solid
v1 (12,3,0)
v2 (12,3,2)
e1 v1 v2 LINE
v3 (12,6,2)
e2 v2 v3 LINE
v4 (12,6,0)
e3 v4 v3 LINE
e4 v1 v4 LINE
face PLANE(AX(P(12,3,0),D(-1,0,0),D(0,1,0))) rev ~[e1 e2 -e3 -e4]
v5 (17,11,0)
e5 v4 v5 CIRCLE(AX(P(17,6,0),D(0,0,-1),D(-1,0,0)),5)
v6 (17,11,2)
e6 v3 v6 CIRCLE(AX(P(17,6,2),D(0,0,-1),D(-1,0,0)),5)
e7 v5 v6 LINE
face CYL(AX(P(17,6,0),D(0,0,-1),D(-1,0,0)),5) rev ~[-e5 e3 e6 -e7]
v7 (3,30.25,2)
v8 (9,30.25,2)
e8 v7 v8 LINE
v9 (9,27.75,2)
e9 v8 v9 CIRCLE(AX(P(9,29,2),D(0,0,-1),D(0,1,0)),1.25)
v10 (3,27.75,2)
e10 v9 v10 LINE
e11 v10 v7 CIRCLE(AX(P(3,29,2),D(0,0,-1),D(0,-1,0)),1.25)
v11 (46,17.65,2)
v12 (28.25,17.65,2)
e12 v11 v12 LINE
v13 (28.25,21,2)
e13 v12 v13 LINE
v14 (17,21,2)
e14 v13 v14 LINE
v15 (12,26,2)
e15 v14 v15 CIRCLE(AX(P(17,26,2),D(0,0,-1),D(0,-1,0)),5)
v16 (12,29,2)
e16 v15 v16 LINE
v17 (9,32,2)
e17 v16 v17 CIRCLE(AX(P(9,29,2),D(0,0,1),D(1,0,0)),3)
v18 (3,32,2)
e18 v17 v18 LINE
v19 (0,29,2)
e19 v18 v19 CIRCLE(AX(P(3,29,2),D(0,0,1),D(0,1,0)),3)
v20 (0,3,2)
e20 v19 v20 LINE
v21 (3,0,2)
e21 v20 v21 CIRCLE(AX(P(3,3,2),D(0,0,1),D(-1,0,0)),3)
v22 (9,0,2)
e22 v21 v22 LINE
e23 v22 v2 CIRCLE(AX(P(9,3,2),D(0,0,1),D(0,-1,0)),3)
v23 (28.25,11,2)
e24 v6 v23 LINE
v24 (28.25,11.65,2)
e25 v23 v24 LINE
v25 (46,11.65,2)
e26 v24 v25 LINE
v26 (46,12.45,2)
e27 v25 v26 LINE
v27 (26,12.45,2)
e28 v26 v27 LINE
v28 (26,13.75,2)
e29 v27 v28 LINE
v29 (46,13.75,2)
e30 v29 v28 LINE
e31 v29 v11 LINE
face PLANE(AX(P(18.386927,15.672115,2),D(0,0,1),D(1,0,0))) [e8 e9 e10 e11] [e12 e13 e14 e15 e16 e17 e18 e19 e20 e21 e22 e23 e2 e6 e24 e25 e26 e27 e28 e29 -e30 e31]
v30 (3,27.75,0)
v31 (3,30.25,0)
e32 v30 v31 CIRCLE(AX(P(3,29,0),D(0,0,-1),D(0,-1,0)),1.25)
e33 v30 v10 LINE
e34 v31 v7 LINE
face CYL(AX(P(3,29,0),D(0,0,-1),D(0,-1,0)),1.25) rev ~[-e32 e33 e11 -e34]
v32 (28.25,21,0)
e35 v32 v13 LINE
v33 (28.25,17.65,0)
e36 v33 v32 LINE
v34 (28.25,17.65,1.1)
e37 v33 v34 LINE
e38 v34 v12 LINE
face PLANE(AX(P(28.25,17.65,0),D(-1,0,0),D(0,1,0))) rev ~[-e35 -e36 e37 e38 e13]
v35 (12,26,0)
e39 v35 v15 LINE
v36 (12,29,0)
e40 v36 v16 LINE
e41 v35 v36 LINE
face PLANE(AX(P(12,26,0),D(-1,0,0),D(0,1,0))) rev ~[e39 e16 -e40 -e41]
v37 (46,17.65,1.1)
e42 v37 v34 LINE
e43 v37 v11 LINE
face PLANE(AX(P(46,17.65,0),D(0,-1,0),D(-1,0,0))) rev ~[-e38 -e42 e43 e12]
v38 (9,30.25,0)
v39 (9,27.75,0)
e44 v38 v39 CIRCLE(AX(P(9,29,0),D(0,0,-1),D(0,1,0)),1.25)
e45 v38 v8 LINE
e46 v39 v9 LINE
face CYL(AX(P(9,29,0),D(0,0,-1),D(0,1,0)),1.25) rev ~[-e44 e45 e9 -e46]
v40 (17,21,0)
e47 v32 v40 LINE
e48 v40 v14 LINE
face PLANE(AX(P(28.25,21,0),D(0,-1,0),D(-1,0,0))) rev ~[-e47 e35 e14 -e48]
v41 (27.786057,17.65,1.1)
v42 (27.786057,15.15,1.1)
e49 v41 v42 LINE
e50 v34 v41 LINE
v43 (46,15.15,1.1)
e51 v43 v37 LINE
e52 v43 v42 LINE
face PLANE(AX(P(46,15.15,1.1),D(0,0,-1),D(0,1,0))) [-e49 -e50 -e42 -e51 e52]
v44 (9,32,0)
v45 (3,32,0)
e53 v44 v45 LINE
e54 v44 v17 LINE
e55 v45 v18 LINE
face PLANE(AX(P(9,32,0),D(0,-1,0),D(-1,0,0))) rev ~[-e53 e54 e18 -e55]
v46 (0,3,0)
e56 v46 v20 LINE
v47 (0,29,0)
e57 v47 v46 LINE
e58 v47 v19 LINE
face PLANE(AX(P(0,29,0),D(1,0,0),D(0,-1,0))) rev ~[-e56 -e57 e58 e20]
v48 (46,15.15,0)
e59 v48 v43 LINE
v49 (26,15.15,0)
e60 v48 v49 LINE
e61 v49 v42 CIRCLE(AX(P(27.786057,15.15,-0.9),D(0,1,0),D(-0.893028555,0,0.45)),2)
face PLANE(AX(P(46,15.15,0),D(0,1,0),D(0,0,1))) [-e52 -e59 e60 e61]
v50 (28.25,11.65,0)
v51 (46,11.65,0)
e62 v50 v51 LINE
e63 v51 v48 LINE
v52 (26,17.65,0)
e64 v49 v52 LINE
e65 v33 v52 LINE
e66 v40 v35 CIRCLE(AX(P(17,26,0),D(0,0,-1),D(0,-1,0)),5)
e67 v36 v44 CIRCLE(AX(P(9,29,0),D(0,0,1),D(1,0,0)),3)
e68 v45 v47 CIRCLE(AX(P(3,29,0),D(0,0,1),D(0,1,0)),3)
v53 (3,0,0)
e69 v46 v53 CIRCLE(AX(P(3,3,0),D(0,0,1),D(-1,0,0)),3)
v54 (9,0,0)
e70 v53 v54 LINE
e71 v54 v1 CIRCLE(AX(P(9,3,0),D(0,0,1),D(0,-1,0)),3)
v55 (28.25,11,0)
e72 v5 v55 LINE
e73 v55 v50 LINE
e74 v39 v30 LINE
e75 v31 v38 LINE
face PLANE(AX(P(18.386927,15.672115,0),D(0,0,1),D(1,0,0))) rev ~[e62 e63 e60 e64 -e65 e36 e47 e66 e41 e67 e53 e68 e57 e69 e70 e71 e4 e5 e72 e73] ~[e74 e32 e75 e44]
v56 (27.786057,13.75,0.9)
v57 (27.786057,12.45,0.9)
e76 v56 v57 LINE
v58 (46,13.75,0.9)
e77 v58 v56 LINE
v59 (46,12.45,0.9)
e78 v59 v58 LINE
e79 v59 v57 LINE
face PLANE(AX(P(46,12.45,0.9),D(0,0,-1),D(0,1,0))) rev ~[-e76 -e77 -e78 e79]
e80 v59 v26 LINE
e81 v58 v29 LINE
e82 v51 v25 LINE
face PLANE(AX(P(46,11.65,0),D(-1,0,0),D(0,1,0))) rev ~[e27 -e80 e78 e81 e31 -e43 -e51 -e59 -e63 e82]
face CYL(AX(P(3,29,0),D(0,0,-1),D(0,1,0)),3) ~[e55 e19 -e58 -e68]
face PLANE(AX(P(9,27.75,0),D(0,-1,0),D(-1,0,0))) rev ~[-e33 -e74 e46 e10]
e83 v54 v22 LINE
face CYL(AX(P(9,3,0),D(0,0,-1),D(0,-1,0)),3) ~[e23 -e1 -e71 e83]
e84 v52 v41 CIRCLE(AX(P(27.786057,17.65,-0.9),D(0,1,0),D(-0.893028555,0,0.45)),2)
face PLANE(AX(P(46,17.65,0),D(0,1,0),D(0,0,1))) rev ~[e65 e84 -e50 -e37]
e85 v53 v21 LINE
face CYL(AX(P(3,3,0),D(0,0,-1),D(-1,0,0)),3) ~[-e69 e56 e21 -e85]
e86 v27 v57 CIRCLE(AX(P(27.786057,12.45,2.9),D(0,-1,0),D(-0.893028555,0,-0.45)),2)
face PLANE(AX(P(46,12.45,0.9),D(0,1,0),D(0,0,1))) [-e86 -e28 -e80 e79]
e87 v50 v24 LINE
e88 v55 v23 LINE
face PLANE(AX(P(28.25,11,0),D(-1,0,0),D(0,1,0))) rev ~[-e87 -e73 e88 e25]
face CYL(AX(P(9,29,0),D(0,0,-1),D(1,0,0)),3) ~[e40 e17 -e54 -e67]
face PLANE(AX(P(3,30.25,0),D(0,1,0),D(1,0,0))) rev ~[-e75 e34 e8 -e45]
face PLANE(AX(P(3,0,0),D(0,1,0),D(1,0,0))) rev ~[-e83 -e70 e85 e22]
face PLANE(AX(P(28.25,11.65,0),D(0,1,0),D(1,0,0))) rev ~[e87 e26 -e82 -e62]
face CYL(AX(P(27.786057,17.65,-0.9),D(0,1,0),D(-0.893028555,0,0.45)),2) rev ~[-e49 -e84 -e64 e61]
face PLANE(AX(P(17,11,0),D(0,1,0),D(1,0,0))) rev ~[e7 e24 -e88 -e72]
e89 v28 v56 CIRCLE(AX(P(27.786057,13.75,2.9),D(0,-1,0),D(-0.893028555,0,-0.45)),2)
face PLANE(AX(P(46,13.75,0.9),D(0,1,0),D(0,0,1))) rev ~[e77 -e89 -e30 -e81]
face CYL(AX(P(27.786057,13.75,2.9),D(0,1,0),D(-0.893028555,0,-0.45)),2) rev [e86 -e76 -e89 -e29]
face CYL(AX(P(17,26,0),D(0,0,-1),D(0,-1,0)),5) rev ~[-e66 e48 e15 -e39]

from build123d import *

# Parameters (mm, degrees)
F1_DEPTH    = 2
F2_W        = 1.3
F2_H        = 1.1
F2_W_2      = 2.5
F3_DEPTH    = 20
F4_T1_DEPTH = 1.3
F5_T4_DEPTH = 6.9651427749


# Not quite as in the source:
# - a fillet or chamfer that OpenCascade refuses, or shapes differently, is made with other operations: its cross-section is extruded or revolved along the edge and cut away or added


with BuildPart() as f1:
    # F0 (on Top) → F1 (new body)
    with BuildSketch(Plane.XY):
        with BuildLine():
            ThreePointArc((0, 3), (0.8786796564, 0.8786796564), (3, 0))
            Line((3, 0), (9, 0))
            ThreePointArc((9, 0), (11.1213203436, 0.8786796564), (12, 3))
            Line((12, 3), (12, 6))
            ThreePointArc((12, 6), (13.4644660941, 9.5355339059), (17, 11))
            Line((17, 11), (28.25, 11))
            Line((28.25, 11), (28.25, 11.65))
            Line((28.25, 11.65), (46, 11.65))
            Line((46, 11.65), (46, 17.65))
            Line((46, 17.65), (28.25, 17.65))
            Line((28.25, 17.65), (28.25, 21))
            Line((28.25, 21), (17, 21))
            ThreePointArc((17, 21), (13.4644660941, 22.4644660941), (12, 26))
            Line((12, 26), (12, 29))
            ThreePointArc((12, 29), (11.1213203436, 31.1213203436), (9, 32))
            Line((9, 32), (3, 32))
            ThreePointArc((3, 32), (0.8786796564, 31.1213203436), (0, 29))
            Line((0, 29), (0, 3))
        make_face()
        with BuildLine():
            ThreePointArc((3, 27.75), (1.75, 29), (3, 30.25))
            Line((3, 30.25), (9, 30.25))
            ThreePointArc((9, 30.25), (10.25, 29), (9, 27.75))
            Line((9, 27.75), (3, 27.75))
        make_face(mode=Mode.SUBTRACT)
    extrude(amount=F1_DEPTH)

    # F2 (on face) → F3 (cut)
    with BuildSketch(Plane.YZ.offset(46)):
        with Locations((13.1, 1.45)):
            Rectangle(F2_W, F2_H)
        with Locations((16.4, 0.55)):
            Rectangle(F2_W_2, F2_H)
    extrude(amount=-F3_DEPTH, mode=Mode.SUBTRACT)

    # F4: fillet of radius 2 on 1 edges, made by hand

    # F4_s2 → F4_t1 (join)
    with BuildSketch(Plane.XZ.offset(-13.75)):
        with BuildLine():
            ThreePointArc((26, 2), (26.7372482618, 1.1970613634), (27.7860571099, 0.9))
            Line((27.7860571099, 0.9), (26, 0.9))
            Line((26, 0.9), (26, 2))
        make_face()
    extrude(amount=F4_T1_DEPTH)

    # F5: fillet of radius 2 on 1 edges, made by hand


with BuildPart() as f5_tool2:
    # F5_s3 → F5_t4 (new body)
    with BuildSketch(Plane.XZ.offset(-17.65)):
        with BuildLine():
            ThreePointArc((26, 0), (26.7372482618, 0.8029386366), (27.7860571099, 1.1))
            Line((27.7860571099, 1.1), (26, 1.1))
            Line((26, 1.1), (26, 0))
        make_face()
    extrude(amount=F5_T4_DEPTH)

    split(bisect_by=Plane.XZ.offset(-13.75), keep=Keep.BOTTOM)


with BuildPart() as f1_1:
    add(f1.part)

    # F5_t1: union F5_tool2
    add(f5_tool2.part)


solid = f1_1.part
